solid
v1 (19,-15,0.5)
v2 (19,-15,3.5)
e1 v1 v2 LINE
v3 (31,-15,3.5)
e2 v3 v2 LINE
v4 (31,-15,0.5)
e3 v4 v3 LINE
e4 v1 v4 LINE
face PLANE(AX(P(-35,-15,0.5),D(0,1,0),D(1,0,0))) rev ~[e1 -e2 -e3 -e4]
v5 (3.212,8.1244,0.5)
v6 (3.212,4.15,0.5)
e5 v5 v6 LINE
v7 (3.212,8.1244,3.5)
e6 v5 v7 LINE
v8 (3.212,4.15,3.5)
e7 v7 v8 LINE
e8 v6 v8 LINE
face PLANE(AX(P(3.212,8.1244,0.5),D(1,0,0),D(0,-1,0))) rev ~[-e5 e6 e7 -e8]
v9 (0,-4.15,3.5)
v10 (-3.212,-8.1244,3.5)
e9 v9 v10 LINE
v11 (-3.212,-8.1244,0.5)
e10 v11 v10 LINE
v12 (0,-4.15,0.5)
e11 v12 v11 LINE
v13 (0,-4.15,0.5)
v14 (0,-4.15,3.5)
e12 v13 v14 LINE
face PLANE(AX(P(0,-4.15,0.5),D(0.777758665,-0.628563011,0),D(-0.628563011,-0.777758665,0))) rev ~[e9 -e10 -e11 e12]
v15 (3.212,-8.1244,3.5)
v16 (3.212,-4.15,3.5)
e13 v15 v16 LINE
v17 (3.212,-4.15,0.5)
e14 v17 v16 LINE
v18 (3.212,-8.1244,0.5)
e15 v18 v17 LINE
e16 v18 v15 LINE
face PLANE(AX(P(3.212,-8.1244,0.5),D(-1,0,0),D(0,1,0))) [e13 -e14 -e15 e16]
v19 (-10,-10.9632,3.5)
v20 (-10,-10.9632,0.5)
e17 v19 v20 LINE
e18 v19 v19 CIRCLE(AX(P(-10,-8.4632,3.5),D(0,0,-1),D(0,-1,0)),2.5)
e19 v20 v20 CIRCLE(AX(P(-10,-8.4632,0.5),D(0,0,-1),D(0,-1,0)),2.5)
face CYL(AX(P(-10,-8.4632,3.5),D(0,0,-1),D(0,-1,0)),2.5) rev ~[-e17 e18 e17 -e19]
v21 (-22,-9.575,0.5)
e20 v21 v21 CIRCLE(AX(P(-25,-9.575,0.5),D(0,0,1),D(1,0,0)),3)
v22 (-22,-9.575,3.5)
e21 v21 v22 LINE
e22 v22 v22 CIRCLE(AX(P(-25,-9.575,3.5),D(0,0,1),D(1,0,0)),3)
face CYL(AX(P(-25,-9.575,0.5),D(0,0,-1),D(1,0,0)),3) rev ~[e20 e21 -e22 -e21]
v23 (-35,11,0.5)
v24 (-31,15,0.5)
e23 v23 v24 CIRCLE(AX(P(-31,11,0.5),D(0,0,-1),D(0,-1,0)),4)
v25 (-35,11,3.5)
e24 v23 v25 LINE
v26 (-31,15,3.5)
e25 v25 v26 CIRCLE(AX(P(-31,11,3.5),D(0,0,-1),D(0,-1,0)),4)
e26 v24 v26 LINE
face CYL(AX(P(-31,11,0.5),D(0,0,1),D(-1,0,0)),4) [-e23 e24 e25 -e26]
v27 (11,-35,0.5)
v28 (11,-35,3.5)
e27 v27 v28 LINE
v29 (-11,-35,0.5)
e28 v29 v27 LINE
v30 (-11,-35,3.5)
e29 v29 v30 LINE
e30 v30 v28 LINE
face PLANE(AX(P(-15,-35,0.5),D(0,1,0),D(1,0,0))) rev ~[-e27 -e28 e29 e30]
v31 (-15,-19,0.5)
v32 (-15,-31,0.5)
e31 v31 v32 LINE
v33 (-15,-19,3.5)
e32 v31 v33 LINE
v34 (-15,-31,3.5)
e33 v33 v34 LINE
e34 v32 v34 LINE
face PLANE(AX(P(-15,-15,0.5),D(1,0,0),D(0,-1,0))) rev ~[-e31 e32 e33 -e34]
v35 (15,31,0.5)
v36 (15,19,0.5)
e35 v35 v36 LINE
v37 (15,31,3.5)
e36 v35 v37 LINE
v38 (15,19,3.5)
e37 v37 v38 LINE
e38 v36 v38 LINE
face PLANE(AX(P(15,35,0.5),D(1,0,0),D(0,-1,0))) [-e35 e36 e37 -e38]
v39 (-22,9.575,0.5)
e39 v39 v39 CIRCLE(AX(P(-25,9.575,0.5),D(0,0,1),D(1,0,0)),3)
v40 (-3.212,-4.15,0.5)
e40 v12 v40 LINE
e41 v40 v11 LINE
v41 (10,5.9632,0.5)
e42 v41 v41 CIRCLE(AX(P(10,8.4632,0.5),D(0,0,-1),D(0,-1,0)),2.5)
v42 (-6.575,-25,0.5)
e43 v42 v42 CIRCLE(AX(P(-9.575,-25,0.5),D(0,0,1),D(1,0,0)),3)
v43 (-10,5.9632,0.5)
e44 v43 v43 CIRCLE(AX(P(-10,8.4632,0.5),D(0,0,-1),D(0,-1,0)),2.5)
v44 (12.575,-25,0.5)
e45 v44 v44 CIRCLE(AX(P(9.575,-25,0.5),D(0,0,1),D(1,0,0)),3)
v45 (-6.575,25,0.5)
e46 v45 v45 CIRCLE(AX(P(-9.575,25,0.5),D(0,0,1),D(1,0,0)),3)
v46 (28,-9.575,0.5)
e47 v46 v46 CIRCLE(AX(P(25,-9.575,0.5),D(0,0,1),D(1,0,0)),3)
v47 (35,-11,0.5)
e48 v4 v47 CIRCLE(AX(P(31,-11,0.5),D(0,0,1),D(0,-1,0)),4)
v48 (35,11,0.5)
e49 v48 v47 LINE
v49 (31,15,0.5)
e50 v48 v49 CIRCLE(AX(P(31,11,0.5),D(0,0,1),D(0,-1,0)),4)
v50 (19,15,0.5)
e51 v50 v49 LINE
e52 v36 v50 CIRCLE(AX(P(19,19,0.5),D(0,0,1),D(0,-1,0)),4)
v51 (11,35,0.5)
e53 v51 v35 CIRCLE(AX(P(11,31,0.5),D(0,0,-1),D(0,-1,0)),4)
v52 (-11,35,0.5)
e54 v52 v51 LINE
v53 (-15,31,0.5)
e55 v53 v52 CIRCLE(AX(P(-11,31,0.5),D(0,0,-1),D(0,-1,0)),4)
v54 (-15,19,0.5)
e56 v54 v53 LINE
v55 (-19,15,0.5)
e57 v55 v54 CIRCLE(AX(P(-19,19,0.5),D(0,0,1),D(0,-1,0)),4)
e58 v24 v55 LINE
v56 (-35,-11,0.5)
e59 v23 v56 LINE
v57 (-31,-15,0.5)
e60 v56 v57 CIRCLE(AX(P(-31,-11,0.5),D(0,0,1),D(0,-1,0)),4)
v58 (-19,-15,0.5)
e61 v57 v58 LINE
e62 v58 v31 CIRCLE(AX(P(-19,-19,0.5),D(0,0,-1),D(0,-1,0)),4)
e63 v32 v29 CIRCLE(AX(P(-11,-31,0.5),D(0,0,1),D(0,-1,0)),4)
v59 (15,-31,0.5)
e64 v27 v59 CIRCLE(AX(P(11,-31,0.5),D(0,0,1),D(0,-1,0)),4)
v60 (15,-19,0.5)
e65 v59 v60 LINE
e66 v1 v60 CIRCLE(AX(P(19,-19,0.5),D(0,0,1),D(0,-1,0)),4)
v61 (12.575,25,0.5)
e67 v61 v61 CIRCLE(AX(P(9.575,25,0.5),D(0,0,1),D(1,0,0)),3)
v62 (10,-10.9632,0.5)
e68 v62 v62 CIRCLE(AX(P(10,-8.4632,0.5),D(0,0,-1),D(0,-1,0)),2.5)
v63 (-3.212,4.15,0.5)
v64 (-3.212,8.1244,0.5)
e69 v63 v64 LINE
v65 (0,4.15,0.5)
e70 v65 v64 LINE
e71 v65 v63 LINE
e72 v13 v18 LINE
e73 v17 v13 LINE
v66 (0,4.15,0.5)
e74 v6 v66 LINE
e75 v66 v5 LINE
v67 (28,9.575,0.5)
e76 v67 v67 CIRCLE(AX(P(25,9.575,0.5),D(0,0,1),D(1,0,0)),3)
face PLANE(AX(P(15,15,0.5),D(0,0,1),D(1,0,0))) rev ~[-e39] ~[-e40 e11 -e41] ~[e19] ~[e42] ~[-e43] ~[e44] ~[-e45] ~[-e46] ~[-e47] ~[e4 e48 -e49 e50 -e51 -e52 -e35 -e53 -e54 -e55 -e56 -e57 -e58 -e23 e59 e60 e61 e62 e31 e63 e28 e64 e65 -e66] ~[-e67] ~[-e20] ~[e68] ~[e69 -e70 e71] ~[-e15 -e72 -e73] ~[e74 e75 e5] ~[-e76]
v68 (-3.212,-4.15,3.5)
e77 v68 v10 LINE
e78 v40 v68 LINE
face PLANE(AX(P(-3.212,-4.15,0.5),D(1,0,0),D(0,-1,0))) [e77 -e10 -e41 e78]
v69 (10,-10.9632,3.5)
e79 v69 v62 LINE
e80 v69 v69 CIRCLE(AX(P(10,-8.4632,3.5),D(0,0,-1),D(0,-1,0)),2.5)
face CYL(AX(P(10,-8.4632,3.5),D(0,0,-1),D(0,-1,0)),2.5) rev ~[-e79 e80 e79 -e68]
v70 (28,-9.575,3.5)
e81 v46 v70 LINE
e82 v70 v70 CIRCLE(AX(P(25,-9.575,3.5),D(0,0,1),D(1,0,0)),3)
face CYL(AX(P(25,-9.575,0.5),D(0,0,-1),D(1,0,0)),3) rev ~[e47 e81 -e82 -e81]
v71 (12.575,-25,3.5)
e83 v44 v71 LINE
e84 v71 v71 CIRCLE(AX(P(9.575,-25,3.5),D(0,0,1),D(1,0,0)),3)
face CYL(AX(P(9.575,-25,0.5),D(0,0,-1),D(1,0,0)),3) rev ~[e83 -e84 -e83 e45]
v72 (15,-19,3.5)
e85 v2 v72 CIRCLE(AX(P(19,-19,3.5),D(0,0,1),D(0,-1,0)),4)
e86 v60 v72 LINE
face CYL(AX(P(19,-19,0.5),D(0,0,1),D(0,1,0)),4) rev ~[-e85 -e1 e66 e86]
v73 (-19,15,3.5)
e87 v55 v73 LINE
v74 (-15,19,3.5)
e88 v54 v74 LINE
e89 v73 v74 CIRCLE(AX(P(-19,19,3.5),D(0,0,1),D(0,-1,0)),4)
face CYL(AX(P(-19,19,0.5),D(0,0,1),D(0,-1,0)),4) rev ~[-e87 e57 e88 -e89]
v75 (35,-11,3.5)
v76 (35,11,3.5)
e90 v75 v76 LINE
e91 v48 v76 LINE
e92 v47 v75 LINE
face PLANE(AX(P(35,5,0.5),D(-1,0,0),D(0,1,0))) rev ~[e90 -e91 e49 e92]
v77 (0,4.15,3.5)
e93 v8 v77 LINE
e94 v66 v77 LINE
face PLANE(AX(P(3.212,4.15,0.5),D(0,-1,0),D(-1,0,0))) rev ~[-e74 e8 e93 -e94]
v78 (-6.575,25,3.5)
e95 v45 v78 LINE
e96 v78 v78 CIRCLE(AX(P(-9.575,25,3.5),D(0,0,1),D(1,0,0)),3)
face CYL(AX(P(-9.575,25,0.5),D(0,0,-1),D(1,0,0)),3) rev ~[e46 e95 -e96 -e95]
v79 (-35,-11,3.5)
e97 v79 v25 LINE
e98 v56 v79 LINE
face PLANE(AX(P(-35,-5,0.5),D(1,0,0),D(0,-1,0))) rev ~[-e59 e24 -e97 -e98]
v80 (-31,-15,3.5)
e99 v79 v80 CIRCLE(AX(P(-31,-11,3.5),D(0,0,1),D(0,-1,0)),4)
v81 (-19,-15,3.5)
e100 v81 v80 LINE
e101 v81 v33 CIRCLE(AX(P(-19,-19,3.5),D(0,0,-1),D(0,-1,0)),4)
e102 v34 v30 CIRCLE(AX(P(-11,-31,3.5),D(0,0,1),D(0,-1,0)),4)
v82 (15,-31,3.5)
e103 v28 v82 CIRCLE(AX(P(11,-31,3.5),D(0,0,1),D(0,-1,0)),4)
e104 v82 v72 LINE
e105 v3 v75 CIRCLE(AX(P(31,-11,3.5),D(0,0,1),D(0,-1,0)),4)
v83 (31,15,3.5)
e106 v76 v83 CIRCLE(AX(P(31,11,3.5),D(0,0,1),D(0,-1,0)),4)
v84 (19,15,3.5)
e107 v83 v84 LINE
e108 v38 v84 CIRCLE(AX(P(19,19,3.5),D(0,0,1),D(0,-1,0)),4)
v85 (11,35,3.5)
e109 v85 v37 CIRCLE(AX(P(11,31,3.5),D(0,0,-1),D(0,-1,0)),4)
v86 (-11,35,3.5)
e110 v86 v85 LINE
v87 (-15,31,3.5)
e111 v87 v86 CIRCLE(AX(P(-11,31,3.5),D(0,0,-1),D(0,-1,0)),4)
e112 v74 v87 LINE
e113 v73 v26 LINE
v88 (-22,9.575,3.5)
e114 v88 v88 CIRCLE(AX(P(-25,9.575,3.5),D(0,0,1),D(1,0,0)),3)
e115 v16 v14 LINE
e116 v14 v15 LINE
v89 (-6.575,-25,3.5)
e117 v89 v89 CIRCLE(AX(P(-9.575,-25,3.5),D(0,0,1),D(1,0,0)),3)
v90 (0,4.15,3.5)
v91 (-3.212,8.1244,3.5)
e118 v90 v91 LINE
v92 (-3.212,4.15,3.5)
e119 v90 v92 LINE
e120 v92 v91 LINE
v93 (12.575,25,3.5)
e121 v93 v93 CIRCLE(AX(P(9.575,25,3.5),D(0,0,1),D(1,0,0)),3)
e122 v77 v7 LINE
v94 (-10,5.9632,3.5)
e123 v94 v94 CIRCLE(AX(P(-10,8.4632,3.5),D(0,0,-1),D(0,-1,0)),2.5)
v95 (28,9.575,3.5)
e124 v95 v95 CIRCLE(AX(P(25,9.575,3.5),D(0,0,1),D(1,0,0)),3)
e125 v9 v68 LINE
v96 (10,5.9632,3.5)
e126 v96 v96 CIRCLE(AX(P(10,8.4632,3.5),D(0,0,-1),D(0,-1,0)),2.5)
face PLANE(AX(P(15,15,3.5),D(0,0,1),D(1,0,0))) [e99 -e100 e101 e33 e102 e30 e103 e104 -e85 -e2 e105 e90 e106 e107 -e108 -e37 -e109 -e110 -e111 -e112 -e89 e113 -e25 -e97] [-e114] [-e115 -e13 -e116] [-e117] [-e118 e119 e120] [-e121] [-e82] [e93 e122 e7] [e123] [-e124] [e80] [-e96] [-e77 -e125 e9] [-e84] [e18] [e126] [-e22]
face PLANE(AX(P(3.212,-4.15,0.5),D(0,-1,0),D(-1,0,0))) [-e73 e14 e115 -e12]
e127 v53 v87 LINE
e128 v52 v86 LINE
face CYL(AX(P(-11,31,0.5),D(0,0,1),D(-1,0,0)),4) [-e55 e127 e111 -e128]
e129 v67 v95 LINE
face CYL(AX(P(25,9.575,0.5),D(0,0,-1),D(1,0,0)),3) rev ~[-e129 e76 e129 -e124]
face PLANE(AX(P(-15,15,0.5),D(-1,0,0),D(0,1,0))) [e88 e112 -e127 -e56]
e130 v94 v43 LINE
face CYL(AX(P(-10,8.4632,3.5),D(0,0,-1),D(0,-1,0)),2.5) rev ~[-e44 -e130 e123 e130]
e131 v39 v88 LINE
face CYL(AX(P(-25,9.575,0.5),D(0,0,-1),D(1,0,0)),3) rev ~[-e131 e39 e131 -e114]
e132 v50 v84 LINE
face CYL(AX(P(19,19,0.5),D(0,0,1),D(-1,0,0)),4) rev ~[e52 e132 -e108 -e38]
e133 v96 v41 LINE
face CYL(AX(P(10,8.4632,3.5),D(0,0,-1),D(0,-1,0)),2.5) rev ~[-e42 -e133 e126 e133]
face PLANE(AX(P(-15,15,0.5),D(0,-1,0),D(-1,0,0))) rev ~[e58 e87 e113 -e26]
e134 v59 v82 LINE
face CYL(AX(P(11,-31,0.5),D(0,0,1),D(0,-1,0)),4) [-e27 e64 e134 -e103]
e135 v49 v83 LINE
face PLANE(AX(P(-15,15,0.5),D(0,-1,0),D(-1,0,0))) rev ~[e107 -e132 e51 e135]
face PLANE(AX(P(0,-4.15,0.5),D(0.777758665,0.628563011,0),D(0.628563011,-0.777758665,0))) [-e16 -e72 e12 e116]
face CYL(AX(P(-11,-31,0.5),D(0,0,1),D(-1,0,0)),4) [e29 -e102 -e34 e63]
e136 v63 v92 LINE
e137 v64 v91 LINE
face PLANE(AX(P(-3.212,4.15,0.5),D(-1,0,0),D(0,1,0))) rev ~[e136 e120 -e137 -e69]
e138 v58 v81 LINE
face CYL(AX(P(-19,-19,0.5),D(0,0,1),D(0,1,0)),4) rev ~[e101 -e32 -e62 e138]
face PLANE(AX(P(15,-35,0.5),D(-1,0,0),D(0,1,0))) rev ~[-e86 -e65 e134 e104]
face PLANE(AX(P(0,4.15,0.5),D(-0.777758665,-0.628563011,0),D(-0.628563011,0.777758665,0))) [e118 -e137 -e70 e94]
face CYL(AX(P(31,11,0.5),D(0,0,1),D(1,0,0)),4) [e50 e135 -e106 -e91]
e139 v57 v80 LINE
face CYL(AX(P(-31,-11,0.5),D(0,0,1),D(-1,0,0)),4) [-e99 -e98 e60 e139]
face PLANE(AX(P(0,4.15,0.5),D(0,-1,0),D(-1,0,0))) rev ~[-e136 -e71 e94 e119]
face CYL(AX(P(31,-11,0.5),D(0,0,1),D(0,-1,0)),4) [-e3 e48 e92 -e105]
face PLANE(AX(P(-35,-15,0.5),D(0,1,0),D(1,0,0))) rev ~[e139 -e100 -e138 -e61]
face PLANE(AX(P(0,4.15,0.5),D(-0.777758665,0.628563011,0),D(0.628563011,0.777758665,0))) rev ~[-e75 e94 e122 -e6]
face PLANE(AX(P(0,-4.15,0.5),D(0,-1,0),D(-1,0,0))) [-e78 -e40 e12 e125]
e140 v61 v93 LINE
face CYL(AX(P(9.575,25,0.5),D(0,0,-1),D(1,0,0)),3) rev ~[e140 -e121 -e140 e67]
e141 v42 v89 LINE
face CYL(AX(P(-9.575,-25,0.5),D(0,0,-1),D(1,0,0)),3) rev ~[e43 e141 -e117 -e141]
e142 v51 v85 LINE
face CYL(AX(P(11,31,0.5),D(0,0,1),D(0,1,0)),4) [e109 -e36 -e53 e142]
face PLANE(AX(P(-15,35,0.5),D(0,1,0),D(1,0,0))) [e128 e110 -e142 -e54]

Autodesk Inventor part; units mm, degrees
sketch "Sketch1" plane through (0, 0, 0) normal (0, 0, 1) x (1, 0, 0)
  line L0 (-336.1151, 0) -> (336.1151, 0) construction
  line L1 (15, 0) -> (50, 0) construction
  arc A0 (118.85, 219.94) -> (113.6034, 240) centre (-43.6266, 188.1614) ccw
  spline S0 degree 3 poles (118.85, 219.94) (128.5526, 163.9297) (111.383, 35.0272) (50, 0) knots 0 0 0 0 1 1 1 1
  line L2 (15, -15) -> (-15, -15)
  line L3 (-15, -15) -> (-15, 15)
  line L4 (-15, 15) -> (15, 15)
  line L5 (15, 15) -> (15, -15)
  line L6 (15, -15) -> (-15, 15) construction
  line L7 (-15, -15) -> (15, 15) construction
  line L8 (-32.5, -4.15) -> (32.5, -4.15) construction
  line L9 (32.5, -4.15) -> (32.5, 4.15) construction
  line L10 (32.5, 4.15) -> (-32.5, 4.15) construction
  line L11 (-32.5, 4.15) -> (-32.5, -4.15) construction
  line L12 (-32.5, -4.15) -> (32.5, 4.15) construction
  line L13 (32.5, -4.15) -> (-32.5, 4.15) construction
  arc A1 (15, 0) -> (50, 0) centre (32.5, 54.6766) ccw
  arc A2 (0, 15) -> (0, 50) centre (-54.6766, 32.5) ccw
  spline S1 degree 3 poles (-219.94, 118.85) (-163.9297, 128.5526) (-35.0272, 111.383) (0, 50) knots 0 0 0 0 1 1 1 1
  arc A3 (-219.94, 118.85) -> (-240, 113.6034) centre (-188.1614, -43.6266) ccw
  arc A4 (-15, 0) -> (-50, 0) centre (-32.5, -54.6766) ccw
  spline S2 degree 3 poles (-118.85, -219.94) (-128.5526, -163.9297) (-111.383, -35.0272) (-50, 0) knots 0 0 0 0 1 1 1 1
  arc A5 (-118.85, -219.94) -> (-113.6034, -240) centre (43.6266, -188.1614) ccw
  arc A6 (0, -15) -> (0, -50) centre (54.6766, -32.5) ccw
  spline S3 degree 3 poles (219.94, -118.85) (163.9297, -128.5526) (35.0272, -111.383) (0, -50) knots 0 0 0 0 1 1 1 1
  arc A7 (219.94, -118.85) -> (240, -113.6034) centre (188.1614, 43.6266) ccw
  point P0 (0, 0)
  point P1 (96.03, 57.2611)
  point P2 (119.66, 152.26)
  point P3 (119.6553, 152.2584)
  point P4 (0, 0)
  point P5 (-152.2584, 119.6553)
  point P6 (-57.2611, 96.03)
  point P7 (-15, 0)
  point P8 (-119.6553, -152.2584)
  point P9 (-96.03, -57.2611)
  point P10 (0, -15)
  point P11 (240, -113.6034)
  point P12 (152.2584, -119.6553)
  point P13 (57.2611, -96.03)
  point P14 (-15, 0)
  point P15 (-152.2584, 119.6553)
  point P16 (-57.2611, 96.03)
  point P17 (-119.6553, -152.2584)
  point P18 (-96.03, -57.2611)
  point P19 (152.2584, -119.6553)
  point P20 (57.2611, -96.03)
  dimension "d0" = 50
  dimension "d1" = 57.2611
  dimension "d2" = 96.03
  dimension "d3" = 119.66
  dimension "d6" = 118.85
  dimension "d12" = 240
  dimension "d38" = 65
  dimension "d39" = 8.3
  dimension "d61" = 360
sketch "Sketch2" plane through (0, 0, 0) normal (1, 0, 0) x (0, 1, 0)
  point P0 (0, 0)
  point P1 (0, 0)
  point P2 (240, 0)
ref_plane "Work Plane1" through (15, 0, 0) normal (1, 0, 0) x (0, 1, 0)
sketch "Sketch3" plane through (15, 0, 0) normal (1, 0, 0) x (0, 1, 0)
  line L0 (-10, -0.5) -> (10, -0.5)
  line L1 (10, -0.5) -> (10, 0.5)
  line L2 (10, 0.5) -> (-10, 0.5)
  line L3 (-10, 0.5) -> (-10, -0.5)
  line L4 (-10, -0.5) -> (10, 0.5) construction
  line L5 (10, -0.5) -> (-10, 0.5) construction
  point P0 (0, 0)
  dimension "d8" = 20
  dimension "d9" = 1
ref_plane "Work Plane2" through (52.6524, -10, -0.5) normal (0, 0, -1) x (-1, 0, 0)
sketch "Sketch4" plane through (52.6524, -10, -0.5) normal (0, 0, -1) x (-1, 0, 0)
  point P0 (52.6524, 10)
  point P1 (2.6524, 10)
  point P2 (-43.3776, 67.2611)
  point P3 (-67.0076, 162.26)
  point P4 (-66.1976, 229.94)
ref_plane "Work Plane3" through (15, -10, 0.5) normal (0, 0, 1) x (1, 0, 0)
sketch "Sketch5" plane through (15, -10, 0.5) normal (0, 0, 1) x (1, 0, 0)
  line L0 (17.5, 14.15) -> (-47.5, 14.15) construction
  line L1 (-47.5, 5.85) -> (17.5, 5.85) construction
  line L2 (-47.5, 14.15) -> (-47.5, 5.85) construction
  line L3 (17.5, 5.85) -> (17.5, 14.15) construction
  line L4 (0, -5) -> (20, -5)
  line L5 (20, -5) -> (20, 25)
  line L6 (20, 25) -> (0, 25)
  line L7 (0, 25) -> (0, -5)
  line L8 (0, 14.15) -> (20, 25) construction
  line L9 (20, 14.15) -> (0, 25) construction
  line L10 (0, -5) -> (20, 5.85) construction
  line L11 (20, -5) -> (0, 5.85) construction
  line L12 (10, 19.575) -> (10, 0.425) construction
  point P0 (-15, 10)
  point P1 (0, 25)
  point P2 (-30, 25)
  point P3 (-30, -5)
  dimension "d40" = 20
  dimension "d41" = 30
ref_plane "Work Plane5" through (15, 15, 0.5) normal (0, 0, 1) x (1, 0, 0)
sketch "Sketch6" plane through (15, 15, 0.5) normal (0, 0, 1) x (1, 0, 0)
  circle A0 centre (81.03, 42.2611) radius 6.8 projected
  circle A1 centre (103.85, 204.94) radius 6.8 projected
  circle A2 centre (104.66, 137.26) radius 6.8 projected
  circle A3 centre (35, -15) radius 6.8 projected
  arc A4 (113.2428, 206.6719) -> (106.6941, 230.8772) centre (-58.6266, 173.1614) ccw projected
  line L0 (90.5128, 219.1228) -> (106.6941, 230.8772) projected
  arc A5 (94.5125, 203.2183) -> (90.5128, 219.1228) centre (-58.6266, 173.1614) ccw projected
  arc A6 (20, -8.1753) -> (29.677, -6.6675) centre (17.5, 39.6766) ccw projected
  line L1 (20, -8.1753) -> (20, 0) projected
  line L2 (20, 0) -> (0, 0) projected
  line L3 (0, 0) -> (0, -15) projected
  line L4 (-1.9583, -24.4011) -> (0, -15) projected
  arc A7 (-1.9583, -24.4011) -> (0, -24.9633) centre (17.5, 39.6766) ccw projected
  line L5 (0, -24.9633) -> (0, -30) projected
  line L6 (0, -30) -> (20, -30) projected
  line L7 (20, -30) -> (20, -27.2437) projected
  arc A8 (20, -27.2437) -> (37.8217, -24.1325) centre (17.5, 39.6766) ccw projected
  circle A9 centre (10, -24.575) radius 3 projected
  circle A10 centre (10, -5.425) radius 3 projected
  line L8 (0, -15) -> (0, 0) projected
  line L9 (0, 0) -> (-1.9583, 0)
  line L10 (-1.9583, 0) -> (-1.9583, -30)
  line L11 (-1.9583, -30) -> (0, -30)
  line L12 (0, -30) -> (0, 0)
  point P0 (-15, -15)
ref_plane "Work Plane4" through (15, 15, 0.5) normal (0, 0, 1) x (1, 0, 0)
sketch "Sketch7" plane through (15, 15, 0.5) normal (0, 0, 1) x (1, 0, 0)
  line L0 (-50, -30) -> (20, -30)
  line L1 (20, -30) -> (20, 0)
  line L2 (20, 0) -> (-50, 0)
  line L3 (-50, 0) -> (-50, -30)
  line L4 (-16, -30) -> (-14, -30)
  line L5 (-14, 0) -> (-16, 0)
  line L6 (20, -20) -> (20, -10)
  line L7 (-50, -10) -> (-50, -20)
  line L8 (20, 0) -> (20, -30)
  line L9 (20, -30) -> (0, -30)
  line L10 (-50, 0) -> (-30, 0)
  line L11 (-30, -30) -> (-50, -30)
  line L12 (-50, -30) -> (-50, 0)
  line L13 (20, -10) -> (20, 0)
  line L14 (20, 0) -> (0, 0)
  line L15 (0, -30) -> (20, -30) projected
  line L16 (20, -20) -> (20, -30)
  line L17 (20, -30) -> (0, -30)
  line L18 (-30, -30) -> (-16, -30)
  circle A0 centre (10, -5.425) radius 3 projected
  circle A1 centre (10, -24.575) radius 3 projected
  line L19 (-50, -15) -> (20, -15) construction
  circle A2 centre (-40, -5.425) radius 3
  circle A3 centre (-40, -24.575) radius 3
  line L20 (-48.7, -19.15) -> (18.7, -19.15) construction
  line L21 (-48.7, -10.85) -> (-48.7, -15) construction
  line L22 (-48.7, -19.15) -> (18.7, -10.85) construction
  line L23 (18.7, -19.15) -> (-48.7, -10.85) construction
  line L24 (-15, -10.85) -> (-18.212, -6.8756)
  line L25 (-15, -10.85) -> (-11.788, -6.8756)
  line L26 (-50, -19.15) -> (-50, -10.85)
  line L27 (20, -19.15) -> (18.7, -19.15)
  line L28 (20, -10.85) -> (20, -19.15)
  line L29 (18.7, -10.85) -> (-11.788, -10.85) construction
  line L30 (-18.212, -10.85) -> (-48.7, -10.85) construction
  line L31 (-18.212, -6.8756) -> (-11.788, -6.8756)
  line L32 (-48.7, -15) -> (-49.61, -12.5368)
  line L33 (-48.7, -15) -> (-49.61, -17.4632)
  line L34 (-49.61, -17.4632) -> (-49.61, -12.5368)
  line L35 (-18.212, -6.8756) -> (-11.788, -6.8756)
  line L36 (-11.788, -6.8756) -> (-11.788, -10.85)
  line L37 (-11.788, -10.85) -> (-18.212, -10.85)
  line L38 (-18.212, -10.85) -> (-18.212, -6.8756)
  line L39 (-15, -19.15) -> (-18.212, -23.1244)
  line L40 (-15, -19.15) -> (-11.788, -23.1244)
  line L41 (-18.212, -23.1244) -> (-11.788, -23.1244)
  line L42 (-18.212, -23.1244) -> (-11.788, -23.1244)
  line L43 (-11.788, -23.1244) -> (-11.788, -19.15)
  line L44 (-11.788, -19.15) -> (-18.212, -19.15)
  line L45 (-18.212, -19.15) -> (-18.212, -23.1244)
  line L46 (-15, 0) -> (-15, -30) construction
  line L47 (-49.61, -12.5368) -> (-48.7, -12.5368)
  line L48 (-48.7, -12.5368) -> (-48.7, -17.4632)
  line L49 (-48.7, -17.4632) -> (-49.61, -17.4632)
  line L50 (-49.61, -17.4632) -> (-49.61, -12.5368)
  line L51 (18.7, -15) -> (19.61, -12.5368)
  line L52 (18.7, -15) -> (19.61, -17.4632)
  line L53 (19.61, -17.4632) -> (19.61, -12.5368)
  line L54 (19.61, -12.5368) -> (18.7, -12.5368)
  line L55 (18.7, -12.5368) -> (18.7, -17.4632)
  line L56 (18.7, -17.4632) -> (19.61, -17.4632)
  line L57 (19.61, -17.4632) -> (19.61, -12.5368)
  circle A4 centre (-24.575, -40) radius 3
  circle A5 centre (-5.425, -40) radius 3
  circle A6 centre (10, -24.575) radius 3
  circle A7 centre (10, -5.425) radius 3
  circle A8 centre (-5.425, 10) radius 3
  circle A9 centre (-24.575, 10) radius 3
  line L58 (-30, 20) -> (0, 20)
  line L59 (0, 20) -> (0, 0)
  line L60 (0, 0) -> (-30, 0)
  line L61 (-30, 0) -> (-30, 20)
  line L62 (-30, 20) -> (0, 0) construction
  line L63 (0, 20) -> (-30, 0) construction
  line L64 (-30, -50) -> (0, -50)
  line L65 (0, -50) -> (0, -30)
  line L66 (-30, -30) -> (-30, -50)
  line L67 (-30, -50) -> (0, -50)
  line L68 (0, -50) -> (0, -30)
  line L69 (0, -30) -> (-30, -30)
  line L70 (-30, -30) -> (-30, -50)
  point P0 (-15, -15)
  point P1 (-15, 10)
  dimension "d63" = 2
  dimension "d72" = 6
  dimension "d73" = 6
  dimension "d77" = 67.4
  dimension "d78" = 8.3
  dimension "d84" = 70
  dimension "d91" = 360
  dimension "d93" = 30
extrude "Extrusion7" add sketch "Sketch7" along normal blind 3 contours L3 L2 L1 L0 | L24 L31 L25 | L33 L34 L32 | L40 L41 L39 | L51 L53 L52
extrude "Extrusion8" add sketch "Sketch7" along normal blind 3 contours L61 L58 L59 L2
extrude "Extrusion9" add sketch "Sketch7" along normal blind 3 contours L0 L65 L64 L66
fillet "Fillet7" radius 4 12 edges at (15, 15, 2) (15, 35, 2) (35, 15, 2) (35, -15, 2) (15, -35, 2) (-15, -35, 2) (-15, -15, 2) (-35, -15, 2) (-35, 15, 2) (-15, 35, 2) (-15, 15, 2) (15, -15, 2)
sketch "Sketch8" plane through (15, 15, 3.5) normal (0, 0, 1) x (1, 0, 0)
  line L0 (-49.61, -12.5368) -> (-48.7, -12.5368) construction
  line L1 (19.61, -17.4632) -> (18.7, -17.4632) construction
  line L2 (-48.7, -12.5368) -> (18.7, -17.4632) construction
  line L3 (-48.7, -17.4632) -> (18.7, -12.5368) construction
  line L4 (-48.7, -12.5368) -> (18.7, -12.5368) construction
  line L5 (18.7, -12.5368) -> (18.7, -17.4632) construction
  line L6 (18.7, -17.4632) -> (-48.7, -17.4632) construction
  line L7 (-48.7, -17.4632) -> (-48.7, -12.5368) construction
  line L8 (-48.7, -12.5368) -> (-15, -12.5368) construction
  line L9 (-15, -12.5368) -> (-15, -17.4632) construction
  line L10 (-15, -17.4632) -> (-48.7, -17.4632) construction
  line L11 (-48.7, -17.4632) -> (-48.7, -12.5368) construction
  line L12 (-31.85, -17.4632) -> (-31.85, 4.3897) construction
  line L13 (-48.7, -15) -> (-15, -15) construction
  line L14 (-31.85, -6.5368) -> (-1.9543, -6.5368) construction
  line L15 (-48.7, -17.4632) -> (18.7, -17.4632)
  line L16 (18.7, -17.4632) -> (18.7, -12.5368)
  line L17 (18.7, -12.5368) -> (-48.7, -12.5368)
  line L18 (-48.7, -12.5368) -> (-48.7, -17.4632)
  point P0 (-25, -6.5368)
  point P1 (-25, -23.4632)
  point P2 (-5, -6.5368)
  point P3 (-5, -23.4632)
  dimension "d99" = 6
  dimension "d107" = 10
hole "Hole4" at (-10, 8.4632, 3.5) at (-10, -8.4632, 3.5) at (10, -8.4632, 3.5) at (10, 8.4632, 3.5) direction (0, 0, -1) diameter 5 end through all
sketch "Sketch9" plane through (15, 15, 3.5) normal (0, 0, 1) x (1, 0, 0)
  line L0 (-49.61, -12.5368) -> (-48.7, -12.5368) projected
  line L1 (-48.7, -15) -> (-49.61, -12.5368) projected
  line L2 (-49.61, -17.4632) -> (-48.7, -15) projected
  line L3 (-48.7, -15) -> (-48.7, -17.4632) projected
  line L4 (-48.7, -17.4632) -> (-49.61, -17.4632) projected
  line L5 (-48.7, -12.5368) -> (-48.7, -15) projected
  line L6 (18.7, -12.5368) -> (19.61, -12.5368) projected
  line L7 (19.61, -12.5368) -> (18.7, -15) projected
  line L8 (18.7, -15) -> (18.7, -12.5368) projected
  line L9 (18.7, -17.4632) -> (18.7, -15) projected
  line L10 (18.7, -15) -> (19.61, -17.4632) projected
  line L11 (19.61, -17.4632) -> (18.7, -17.4632) projected
  point P0 (-15, -15)
extrude "Extrusion10" add sketch "Sketch9" against normal blind 3
properties part number "underbrink_base_lite" material "Stainless Steel"
